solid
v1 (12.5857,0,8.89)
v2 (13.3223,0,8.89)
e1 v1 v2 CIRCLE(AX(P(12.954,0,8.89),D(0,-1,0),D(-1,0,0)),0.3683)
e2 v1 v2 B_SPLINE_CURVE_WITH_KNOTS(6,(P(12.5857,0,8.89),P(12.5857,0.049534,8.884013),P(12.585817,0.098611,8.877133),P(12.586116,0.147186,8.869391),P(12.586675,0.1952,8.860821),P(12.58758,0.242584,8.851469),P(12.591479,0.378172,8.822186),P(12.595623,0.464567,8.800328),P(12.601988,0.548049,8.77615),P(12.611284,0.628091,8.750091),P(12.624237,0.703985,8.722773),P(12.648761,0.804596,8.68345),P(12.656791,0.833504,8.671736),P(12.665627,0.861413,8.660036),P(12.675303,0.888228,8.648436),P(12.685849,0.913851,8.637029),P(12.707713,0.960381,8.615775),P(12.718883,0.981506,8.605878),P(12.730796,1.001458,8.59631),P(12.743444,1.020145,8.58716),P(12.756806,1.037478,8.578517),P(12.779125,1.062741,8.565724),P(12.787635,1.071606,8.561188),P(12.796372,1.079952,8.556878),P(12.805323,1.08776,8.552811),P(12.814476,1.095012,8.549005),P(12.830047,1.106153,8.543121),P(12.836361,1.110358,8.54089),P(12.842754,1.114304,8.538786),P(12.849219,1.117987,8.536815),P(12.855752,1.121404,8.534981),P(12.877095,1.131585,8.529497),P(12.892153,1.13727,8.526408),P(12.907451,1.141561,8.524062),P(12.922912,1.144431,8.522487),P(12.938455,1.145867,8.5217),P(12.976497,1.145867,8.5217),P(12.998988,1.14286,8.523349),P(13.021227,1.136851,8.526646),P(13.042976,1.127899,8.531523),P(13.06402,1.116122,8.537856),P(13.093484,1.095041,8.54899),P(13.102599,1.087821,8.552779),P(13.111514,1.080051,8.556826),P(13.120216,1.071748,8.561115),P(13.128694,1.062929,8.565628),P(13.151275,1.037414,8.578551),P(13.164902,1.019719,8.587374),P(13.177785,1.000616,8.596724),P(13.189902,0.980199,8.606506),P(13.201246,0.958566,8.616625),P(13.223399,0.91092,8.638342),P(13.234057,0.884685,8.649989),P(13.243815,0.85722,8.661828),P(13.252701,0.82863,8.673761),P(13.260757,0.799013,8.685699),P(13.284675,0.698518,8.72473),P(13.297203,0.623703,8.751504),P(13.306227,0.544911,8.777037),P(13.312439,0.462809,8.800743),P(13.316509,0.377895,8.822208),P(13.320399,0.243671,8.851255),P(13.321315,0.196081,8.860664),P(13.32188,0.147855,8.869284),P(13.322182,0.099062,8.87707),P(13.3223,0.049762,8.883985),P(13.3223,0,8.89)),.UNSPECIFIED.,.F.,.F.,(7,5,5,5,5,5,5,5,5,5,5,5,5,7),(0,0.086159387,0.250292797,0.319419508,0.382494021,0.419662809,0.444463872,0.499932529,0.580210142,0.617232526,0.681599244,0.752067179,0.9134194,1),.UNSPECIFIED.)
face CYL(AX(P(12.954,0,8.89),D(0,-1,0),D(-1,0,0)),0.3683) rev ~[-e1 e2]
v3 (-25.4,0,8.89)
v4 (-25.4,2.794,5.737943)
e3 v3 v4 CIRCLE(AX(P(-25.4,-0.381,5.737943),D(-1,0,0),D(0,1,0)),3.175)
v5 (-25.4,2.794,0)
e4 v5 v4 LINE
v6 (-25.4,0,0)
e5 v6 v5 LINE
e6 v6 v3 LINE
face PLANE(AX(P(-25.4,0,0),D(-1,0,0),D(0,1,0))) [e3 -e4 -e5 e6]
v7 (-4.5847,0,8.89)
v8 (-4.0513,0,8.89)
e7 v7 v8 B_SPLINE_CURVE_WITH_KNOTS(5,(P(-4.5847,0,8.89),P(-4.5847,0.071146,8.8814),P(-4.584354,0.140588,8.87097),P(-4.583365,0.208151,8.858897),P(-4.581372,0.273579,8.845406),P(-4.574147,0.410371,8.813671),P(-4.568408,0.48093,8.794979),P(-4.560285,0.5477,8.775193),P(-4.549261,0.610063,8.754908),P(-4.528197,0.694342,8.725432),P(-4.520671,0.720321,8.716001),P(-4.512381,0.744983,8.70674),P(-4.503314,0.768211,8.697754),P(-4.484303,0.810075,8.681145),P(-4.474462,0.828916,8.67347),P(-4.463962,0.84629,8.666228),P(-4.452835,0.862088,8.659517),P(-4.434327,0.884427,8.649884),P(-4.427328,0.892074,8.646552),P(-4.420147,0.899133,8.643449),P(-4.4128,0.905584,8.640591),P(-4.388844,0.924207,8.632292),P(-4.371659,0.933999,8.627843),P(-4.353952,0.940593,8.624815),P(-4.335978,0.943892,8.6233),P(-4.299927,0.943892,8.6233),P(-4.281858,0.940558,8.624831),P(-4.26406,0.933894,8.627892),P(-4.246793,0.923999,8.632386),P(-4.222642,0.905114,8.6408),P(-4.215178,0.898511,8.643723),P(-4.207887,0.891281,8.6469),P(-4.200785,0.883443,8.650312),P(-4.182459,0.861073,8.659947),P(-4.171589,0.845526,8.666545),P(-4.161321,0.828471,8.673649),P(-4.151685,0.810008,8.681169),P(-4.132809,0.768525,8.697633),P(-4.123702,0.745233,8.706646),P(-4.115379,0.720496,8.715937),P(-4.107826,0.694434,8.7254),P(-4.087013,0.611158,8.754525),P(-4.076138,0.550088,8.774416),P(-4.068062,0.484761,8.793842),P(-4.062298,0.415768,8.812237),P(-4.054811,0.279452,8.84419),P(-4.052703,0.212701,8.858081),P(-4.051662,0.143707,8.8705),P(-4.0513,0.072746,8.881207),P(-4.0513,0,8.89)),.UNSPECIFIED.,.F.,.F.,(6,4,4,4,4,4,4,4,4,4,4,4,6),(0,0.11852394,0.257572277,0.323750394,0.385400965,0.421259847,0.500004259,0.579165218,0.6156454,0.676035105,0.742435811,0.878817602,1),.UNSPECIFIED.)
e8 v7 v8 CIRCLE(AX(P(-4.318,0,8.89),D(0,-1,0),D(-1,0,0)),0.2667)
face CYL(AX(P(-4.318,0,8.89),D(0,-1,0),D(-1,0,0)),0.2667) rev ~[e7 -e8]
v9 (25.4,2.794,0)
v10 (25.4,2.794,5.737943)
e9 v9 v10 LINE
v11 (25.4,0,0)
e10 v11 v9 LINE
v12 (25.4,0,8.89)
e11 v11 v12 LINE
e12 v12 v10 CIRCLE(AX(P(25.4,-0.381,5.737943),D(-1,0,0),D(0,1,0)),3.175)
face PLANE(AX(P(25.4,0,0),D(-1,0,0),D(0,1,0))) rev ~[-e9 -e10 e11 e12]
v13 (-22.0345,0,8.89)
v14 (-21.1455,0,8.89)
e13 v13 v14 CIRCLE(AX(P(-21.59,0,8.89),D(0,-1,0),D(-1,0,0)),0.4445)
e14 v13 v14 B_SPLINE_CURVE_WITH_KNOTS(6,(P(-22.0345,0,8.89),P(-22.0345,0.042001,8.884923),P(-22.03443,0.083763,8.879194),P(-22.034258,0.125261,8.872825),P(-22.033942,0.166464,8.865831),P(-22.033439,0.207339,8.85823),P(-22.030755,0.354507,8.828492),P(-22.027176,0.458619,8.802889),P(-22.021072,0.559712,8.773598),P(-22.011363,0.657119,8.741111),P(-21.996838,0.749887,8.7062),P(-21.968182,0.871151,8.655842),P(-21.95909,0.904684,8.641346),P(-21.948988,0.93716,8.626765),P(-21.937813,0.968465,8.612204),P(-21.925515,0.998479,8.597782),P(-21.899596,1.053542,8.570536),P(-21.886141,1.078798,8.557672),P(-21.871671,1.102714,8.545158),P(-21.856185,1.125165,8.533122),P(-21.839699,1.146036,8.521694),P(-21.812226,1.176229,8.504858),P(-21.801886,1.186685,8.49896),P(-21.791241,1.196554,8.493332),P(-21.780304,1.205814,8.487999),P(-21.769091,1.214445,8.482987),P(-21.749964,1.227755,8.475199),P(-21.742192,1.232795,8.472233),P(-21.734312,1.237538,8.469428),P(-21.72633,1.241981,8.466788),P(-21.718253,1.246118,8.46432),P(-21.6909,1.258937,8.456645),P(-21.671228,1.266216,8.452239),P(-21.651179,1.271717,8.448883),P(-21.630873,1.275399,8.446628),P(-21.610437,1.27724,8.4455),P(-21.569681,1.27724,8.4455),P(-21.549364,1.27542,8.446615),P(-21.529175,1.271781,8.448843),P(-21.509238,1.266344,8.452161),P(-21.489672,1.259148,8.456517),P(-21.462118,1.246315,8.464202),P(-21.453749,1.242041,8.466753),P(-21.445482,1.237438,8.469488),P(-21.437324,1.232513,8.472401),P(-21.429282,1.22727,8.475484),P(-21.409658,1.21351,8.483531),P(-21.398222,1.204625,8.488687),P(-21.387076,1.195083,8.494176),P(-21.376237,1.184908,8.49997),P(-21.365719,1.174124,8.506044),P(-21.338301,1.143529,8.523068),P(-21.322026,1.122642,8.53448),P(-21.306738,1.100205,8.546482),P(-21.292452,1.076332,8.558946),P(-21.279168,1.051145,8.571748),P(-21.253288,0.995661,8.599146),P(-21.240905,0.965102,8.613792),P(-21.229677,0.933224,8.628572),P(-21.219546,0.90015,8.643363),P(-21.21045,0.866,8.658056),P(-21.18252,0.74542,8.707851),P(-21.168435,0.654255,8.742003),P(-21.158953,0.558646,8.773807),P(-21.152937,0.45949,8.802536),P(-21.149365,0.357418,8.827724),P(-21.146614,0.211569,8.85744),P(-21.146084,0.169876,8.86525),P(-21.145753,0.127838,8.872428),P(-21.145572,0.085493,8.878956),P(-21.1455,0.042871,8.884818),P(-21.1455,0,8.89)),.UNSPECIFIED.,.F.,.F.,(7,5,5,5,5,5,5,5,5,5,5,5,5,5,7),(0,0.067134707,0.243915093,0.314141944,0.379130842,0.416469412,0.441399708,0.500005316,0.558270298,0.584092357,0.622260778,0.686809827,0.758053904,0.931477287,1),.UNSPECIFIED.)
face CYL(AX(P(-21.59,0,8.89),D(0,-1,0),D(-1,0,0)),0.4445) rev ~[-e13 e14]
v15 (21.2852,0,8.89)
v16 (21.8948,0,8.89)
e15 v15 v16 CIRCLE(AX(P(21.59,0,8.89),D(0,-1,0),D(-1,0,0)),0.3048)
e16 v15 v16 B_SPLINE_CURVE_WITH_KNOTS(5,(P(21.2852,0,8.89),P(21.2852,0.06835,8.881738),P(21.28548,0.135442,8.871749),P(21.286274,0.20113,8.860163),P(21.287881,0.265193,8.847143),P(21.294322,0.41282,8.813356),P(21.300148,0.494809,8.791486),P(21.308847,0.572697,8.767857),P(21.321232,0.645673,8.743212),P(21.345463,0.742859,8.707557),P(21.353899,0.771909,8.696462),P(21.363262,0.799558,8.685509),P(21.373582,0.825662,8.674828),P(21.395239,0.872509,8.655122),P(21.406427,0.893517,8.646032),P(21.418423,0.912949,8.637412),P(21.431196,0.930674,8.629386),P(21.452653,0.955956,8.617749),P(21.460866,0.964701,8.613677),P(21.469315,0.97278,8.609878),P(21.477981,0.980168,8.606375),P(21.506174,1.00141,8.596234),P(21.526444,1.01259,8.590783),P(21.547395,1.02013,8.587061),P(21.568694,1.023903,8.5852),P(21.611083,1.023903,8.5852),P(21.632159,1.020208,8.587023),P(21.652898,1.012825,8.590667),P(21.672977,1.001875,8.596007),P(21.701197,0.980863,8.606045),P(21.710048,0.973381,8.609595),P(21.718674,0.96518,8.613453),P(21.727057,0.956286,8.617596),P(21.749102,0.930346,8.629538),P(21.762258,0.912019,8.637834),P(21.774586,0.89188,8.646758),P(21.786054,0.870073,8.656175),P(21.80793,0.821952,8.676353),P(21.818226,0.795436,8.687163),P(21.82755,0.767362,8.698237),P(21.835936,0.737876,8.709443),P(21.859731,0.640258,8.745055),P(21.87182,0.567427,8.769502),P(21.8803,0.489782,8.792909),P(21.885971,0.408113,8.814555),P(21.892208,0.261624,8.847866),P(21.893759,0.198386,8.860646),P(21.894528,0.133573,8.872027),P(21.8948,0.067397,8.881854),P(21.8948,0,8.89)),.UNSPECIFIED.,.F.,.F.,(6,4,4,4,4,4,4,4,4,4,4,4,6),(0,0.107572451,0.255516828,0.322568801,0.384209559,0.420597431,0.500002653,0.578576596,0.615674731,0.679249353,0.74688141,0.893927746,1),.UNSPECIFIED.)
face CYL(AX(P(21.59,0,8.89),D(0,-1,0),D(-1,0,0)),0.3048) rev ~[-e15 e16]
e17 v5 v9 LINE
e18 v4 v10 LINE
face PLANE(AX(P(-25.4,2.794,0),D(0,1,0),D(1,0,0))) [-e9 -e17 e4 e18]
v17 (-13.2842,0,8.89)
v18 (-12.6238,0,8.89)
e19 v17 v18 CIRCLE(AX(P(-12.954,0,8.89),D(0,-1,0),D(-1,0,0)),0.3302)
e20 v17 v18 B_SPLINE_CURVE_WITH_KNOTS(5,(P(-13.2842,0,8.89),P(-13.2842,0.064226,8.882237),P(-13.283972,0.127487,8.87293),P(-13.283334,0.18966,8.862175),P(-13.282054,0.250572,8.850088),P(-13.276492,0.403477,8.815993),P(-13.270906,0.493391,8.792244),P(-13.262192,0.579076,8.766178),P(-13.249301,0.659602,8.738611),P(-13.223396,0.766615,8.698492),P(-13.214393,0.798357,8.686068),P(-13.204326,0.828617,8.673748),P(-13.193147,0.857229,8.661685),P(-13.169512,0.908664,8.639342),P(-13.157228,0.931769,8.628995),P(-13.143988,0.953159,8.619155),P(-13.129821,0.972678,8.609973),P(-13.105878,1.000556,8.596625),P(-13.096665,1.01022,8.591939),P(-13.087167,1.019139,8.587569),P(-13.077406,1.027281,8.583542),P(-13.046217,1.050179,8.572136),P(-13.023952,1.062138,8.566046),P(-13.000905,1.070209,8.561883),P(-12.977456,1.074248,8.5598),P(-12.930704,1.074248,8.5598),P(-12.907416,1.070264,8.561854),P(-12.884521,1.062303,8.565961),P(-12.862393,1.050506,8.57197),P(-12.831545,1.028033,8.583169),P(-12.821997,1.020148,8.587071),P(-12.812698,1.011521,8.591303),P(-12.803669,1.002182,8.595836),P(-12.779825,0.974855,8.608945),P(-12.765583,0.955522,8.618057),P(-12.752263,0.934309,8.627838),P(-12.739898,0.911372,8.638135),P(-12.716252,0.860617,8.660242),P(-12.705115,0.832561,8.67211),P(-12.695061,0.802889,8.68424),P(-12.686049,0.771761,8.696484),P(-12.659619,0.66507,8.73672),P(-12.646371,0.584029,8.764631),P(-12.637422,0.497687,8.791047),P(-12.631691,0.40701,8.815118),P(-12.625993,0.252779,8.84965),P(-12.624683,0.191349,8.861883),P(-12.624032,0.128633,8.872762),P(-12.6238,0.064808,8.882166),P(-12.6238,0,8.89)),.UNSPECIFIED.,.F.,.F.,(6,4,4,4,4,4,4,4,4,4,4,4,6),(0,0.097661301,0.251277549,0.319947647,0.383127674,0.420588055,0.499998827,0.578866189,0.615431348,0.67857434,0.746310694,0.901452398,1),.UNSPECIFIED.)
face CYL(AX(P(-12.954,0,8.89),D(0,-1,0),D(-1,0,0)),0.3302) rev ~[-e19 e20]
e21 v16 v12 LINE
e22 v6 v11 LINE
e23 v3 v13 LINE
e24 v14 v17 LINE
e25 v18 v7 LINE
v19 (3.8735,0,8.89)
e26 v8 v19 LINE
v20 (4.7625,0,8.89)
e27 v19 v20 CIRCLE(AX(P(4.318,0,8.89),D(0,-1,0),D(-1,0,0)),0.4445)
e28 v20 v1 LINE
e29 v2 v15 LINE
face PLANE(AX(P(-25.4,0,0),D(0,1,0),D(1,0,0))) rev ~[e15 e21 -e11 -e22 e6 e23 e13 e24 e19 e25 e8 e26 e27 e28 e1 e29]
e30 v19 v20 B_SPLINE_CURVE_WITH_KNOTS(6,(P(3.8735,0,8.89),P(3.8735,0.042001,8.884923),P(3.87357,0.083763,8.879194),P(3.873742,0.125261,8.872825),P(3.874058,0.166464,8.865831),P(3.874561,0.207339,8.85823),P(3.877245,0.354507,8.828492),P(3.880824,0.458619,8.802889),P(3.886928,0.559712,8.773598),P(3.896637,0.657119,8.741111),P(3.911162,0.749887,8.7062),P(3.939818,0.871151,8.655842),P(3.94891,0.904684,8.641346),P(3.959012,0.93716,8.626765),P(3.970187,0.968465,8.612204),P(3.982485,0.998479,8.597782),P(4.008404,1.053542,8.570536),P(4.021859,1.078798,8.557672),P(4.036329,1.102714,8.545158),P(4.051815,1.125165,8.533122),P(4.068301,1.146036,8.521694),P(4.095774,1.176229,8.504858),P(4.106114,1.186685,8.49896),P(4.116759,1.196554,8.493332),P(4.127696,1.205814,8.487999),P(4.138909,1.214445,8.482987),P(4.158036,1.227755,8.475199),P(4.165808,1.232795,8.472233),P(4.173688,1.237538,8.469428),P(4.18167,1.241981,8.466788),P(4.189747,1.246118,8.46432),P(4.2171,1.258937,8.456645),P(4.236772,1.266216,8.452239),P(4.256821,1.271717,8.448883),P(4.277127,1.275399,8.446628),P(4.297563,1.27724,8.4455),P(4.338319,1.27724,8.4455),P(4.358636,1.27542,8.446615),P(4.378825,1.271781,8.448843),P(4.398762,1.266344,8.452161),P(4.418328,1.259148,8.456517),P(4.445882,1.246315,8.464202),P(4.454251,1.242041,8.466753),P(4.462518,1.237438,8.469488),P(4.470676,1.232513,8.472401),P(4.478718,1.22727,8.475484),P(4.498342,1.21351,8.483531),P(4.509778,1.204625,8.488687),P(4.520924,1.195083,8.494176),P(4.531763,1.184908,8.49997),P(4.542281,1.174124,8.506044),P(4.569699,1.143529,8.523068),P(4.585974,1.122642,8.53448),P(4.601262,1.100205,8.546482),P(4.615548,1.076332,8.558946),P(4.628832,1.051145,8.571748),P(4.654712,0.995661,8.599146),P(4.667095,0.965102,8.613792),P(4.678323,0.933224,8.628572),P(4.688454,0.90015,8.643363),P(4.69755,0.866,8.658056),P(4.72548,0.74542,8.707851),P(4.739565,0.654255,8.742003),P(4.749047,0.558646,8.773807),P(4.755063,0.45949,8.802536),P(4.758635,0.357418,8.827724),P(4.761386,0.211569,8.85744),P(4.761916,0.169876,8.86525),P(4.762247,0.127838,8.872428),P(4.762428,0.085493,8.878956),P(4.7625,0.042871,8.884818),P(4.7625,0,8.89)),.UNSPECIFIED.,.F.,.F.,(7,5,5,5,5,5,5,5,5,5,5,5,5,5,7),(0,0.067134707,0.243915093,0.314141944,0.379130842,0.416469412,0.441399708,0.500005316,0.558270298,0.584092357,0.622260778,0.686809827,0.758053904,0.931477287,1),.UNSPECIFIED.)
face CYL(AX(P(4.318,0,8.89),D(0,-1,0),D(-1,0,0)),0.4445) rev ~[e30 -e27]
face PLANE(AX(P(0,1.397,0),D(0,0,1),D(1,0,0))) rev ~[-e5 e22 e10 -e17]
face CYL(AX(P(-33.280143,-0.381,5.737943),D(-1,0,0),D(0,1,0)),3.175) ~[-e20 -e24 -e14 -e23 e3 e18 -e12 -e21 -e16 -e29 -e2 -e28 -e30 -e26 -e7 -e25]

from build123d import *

# Parameters (mm, degrees)
F0_W        = 50.8
F0_H        = 2.794
F1_DEPTH    = 8.89
F2_T1_DEPTH = 66.5602855304
F4_DEPTH    = 25.4


# Not quite as in the source:
# - a fillet or chamfer that OpenCascade refuses, or shapes differently, is made with other operations: its cross-section is extruded or revolved along the edge and cut away or added


with BuildPart() as f1:
    # F0 (on Top) → F1 (new body)
    with BuildSketch(Plane.XY):
        with Locations((0, 1.397)):
            Rectangle(F0_W, F0_H)
    extrude(amount=F1_DEPTH)

    # F2: fillet of radius 3.175 on 1 edges, made by hand

    # F2_s2 → F2_t1 (cut)
    with BuildSketch(Plane.YZ.offset(-33.2801427652)):
        with BuildLine():
            ThreePointArc((2.794, 5.7379428939), (1.9949524406, 7.8439996358), (0, 8.89))
            Line((0, 8.89), (2.794, 8.89))
            Line((2.794, 8.89), (2.794, 5.7379428939))
        make_face()
    extrude(amount=F2_T1_DEPTH, mode=Mode.SUBTRACT)

    # F3 (on face) → F4 (cut)
    with BuildSketch(Plane.XZ):
        with BuildLine():
            ThreePointArc((-22.0345, 8.89), (-21.59, 8.4455), (-21.1455, 8.89))
            Line((-21.1455, 8.89), (-22.0345, 8.89))
        make_face()
        with BuildLine():
            Line((-12.6238, 8.89), (-13.2842, 8.89))
            ThreePointArc((-13.2842, 8.89), (-12.954, 8.5598), (-12.6238, 8.89))
        make_face()
        with BuildLine():
            Line((13.3223, 8.89), (12.5857, 8.89))
            ThreePointArc((12.5857, 8.89), (12.954, 8.5217), (13.3223, 8.89))
        make_face()
        with BuildLine():
            ThreePointArc((21.2852, 8.89), (21.59, 8.5852), (21.8948, 8.89))
            Line((21.8948, 8.89), (21.2852, 8.89))
        make_face()
        with BuildLine():
            Line((-4.0513, 8.89), (-4.5847, 8.89))
            ThreePointArc((-4.5847, 8.89), (-4.318, 8.6233), (-4.0513, 8.89))
        make_face()
        with BuildLine():
            Line((4.7625, 8.89), (3.8735, 8.89))
            ThreePointArc((3.8735, 8.89), (4.318, 8.4455), (4.7625, 8.89))
        make_face()
    extrude(amount=-F4_DEPTH, mode=Mode.SUBTRACT)


solid = f1.part
